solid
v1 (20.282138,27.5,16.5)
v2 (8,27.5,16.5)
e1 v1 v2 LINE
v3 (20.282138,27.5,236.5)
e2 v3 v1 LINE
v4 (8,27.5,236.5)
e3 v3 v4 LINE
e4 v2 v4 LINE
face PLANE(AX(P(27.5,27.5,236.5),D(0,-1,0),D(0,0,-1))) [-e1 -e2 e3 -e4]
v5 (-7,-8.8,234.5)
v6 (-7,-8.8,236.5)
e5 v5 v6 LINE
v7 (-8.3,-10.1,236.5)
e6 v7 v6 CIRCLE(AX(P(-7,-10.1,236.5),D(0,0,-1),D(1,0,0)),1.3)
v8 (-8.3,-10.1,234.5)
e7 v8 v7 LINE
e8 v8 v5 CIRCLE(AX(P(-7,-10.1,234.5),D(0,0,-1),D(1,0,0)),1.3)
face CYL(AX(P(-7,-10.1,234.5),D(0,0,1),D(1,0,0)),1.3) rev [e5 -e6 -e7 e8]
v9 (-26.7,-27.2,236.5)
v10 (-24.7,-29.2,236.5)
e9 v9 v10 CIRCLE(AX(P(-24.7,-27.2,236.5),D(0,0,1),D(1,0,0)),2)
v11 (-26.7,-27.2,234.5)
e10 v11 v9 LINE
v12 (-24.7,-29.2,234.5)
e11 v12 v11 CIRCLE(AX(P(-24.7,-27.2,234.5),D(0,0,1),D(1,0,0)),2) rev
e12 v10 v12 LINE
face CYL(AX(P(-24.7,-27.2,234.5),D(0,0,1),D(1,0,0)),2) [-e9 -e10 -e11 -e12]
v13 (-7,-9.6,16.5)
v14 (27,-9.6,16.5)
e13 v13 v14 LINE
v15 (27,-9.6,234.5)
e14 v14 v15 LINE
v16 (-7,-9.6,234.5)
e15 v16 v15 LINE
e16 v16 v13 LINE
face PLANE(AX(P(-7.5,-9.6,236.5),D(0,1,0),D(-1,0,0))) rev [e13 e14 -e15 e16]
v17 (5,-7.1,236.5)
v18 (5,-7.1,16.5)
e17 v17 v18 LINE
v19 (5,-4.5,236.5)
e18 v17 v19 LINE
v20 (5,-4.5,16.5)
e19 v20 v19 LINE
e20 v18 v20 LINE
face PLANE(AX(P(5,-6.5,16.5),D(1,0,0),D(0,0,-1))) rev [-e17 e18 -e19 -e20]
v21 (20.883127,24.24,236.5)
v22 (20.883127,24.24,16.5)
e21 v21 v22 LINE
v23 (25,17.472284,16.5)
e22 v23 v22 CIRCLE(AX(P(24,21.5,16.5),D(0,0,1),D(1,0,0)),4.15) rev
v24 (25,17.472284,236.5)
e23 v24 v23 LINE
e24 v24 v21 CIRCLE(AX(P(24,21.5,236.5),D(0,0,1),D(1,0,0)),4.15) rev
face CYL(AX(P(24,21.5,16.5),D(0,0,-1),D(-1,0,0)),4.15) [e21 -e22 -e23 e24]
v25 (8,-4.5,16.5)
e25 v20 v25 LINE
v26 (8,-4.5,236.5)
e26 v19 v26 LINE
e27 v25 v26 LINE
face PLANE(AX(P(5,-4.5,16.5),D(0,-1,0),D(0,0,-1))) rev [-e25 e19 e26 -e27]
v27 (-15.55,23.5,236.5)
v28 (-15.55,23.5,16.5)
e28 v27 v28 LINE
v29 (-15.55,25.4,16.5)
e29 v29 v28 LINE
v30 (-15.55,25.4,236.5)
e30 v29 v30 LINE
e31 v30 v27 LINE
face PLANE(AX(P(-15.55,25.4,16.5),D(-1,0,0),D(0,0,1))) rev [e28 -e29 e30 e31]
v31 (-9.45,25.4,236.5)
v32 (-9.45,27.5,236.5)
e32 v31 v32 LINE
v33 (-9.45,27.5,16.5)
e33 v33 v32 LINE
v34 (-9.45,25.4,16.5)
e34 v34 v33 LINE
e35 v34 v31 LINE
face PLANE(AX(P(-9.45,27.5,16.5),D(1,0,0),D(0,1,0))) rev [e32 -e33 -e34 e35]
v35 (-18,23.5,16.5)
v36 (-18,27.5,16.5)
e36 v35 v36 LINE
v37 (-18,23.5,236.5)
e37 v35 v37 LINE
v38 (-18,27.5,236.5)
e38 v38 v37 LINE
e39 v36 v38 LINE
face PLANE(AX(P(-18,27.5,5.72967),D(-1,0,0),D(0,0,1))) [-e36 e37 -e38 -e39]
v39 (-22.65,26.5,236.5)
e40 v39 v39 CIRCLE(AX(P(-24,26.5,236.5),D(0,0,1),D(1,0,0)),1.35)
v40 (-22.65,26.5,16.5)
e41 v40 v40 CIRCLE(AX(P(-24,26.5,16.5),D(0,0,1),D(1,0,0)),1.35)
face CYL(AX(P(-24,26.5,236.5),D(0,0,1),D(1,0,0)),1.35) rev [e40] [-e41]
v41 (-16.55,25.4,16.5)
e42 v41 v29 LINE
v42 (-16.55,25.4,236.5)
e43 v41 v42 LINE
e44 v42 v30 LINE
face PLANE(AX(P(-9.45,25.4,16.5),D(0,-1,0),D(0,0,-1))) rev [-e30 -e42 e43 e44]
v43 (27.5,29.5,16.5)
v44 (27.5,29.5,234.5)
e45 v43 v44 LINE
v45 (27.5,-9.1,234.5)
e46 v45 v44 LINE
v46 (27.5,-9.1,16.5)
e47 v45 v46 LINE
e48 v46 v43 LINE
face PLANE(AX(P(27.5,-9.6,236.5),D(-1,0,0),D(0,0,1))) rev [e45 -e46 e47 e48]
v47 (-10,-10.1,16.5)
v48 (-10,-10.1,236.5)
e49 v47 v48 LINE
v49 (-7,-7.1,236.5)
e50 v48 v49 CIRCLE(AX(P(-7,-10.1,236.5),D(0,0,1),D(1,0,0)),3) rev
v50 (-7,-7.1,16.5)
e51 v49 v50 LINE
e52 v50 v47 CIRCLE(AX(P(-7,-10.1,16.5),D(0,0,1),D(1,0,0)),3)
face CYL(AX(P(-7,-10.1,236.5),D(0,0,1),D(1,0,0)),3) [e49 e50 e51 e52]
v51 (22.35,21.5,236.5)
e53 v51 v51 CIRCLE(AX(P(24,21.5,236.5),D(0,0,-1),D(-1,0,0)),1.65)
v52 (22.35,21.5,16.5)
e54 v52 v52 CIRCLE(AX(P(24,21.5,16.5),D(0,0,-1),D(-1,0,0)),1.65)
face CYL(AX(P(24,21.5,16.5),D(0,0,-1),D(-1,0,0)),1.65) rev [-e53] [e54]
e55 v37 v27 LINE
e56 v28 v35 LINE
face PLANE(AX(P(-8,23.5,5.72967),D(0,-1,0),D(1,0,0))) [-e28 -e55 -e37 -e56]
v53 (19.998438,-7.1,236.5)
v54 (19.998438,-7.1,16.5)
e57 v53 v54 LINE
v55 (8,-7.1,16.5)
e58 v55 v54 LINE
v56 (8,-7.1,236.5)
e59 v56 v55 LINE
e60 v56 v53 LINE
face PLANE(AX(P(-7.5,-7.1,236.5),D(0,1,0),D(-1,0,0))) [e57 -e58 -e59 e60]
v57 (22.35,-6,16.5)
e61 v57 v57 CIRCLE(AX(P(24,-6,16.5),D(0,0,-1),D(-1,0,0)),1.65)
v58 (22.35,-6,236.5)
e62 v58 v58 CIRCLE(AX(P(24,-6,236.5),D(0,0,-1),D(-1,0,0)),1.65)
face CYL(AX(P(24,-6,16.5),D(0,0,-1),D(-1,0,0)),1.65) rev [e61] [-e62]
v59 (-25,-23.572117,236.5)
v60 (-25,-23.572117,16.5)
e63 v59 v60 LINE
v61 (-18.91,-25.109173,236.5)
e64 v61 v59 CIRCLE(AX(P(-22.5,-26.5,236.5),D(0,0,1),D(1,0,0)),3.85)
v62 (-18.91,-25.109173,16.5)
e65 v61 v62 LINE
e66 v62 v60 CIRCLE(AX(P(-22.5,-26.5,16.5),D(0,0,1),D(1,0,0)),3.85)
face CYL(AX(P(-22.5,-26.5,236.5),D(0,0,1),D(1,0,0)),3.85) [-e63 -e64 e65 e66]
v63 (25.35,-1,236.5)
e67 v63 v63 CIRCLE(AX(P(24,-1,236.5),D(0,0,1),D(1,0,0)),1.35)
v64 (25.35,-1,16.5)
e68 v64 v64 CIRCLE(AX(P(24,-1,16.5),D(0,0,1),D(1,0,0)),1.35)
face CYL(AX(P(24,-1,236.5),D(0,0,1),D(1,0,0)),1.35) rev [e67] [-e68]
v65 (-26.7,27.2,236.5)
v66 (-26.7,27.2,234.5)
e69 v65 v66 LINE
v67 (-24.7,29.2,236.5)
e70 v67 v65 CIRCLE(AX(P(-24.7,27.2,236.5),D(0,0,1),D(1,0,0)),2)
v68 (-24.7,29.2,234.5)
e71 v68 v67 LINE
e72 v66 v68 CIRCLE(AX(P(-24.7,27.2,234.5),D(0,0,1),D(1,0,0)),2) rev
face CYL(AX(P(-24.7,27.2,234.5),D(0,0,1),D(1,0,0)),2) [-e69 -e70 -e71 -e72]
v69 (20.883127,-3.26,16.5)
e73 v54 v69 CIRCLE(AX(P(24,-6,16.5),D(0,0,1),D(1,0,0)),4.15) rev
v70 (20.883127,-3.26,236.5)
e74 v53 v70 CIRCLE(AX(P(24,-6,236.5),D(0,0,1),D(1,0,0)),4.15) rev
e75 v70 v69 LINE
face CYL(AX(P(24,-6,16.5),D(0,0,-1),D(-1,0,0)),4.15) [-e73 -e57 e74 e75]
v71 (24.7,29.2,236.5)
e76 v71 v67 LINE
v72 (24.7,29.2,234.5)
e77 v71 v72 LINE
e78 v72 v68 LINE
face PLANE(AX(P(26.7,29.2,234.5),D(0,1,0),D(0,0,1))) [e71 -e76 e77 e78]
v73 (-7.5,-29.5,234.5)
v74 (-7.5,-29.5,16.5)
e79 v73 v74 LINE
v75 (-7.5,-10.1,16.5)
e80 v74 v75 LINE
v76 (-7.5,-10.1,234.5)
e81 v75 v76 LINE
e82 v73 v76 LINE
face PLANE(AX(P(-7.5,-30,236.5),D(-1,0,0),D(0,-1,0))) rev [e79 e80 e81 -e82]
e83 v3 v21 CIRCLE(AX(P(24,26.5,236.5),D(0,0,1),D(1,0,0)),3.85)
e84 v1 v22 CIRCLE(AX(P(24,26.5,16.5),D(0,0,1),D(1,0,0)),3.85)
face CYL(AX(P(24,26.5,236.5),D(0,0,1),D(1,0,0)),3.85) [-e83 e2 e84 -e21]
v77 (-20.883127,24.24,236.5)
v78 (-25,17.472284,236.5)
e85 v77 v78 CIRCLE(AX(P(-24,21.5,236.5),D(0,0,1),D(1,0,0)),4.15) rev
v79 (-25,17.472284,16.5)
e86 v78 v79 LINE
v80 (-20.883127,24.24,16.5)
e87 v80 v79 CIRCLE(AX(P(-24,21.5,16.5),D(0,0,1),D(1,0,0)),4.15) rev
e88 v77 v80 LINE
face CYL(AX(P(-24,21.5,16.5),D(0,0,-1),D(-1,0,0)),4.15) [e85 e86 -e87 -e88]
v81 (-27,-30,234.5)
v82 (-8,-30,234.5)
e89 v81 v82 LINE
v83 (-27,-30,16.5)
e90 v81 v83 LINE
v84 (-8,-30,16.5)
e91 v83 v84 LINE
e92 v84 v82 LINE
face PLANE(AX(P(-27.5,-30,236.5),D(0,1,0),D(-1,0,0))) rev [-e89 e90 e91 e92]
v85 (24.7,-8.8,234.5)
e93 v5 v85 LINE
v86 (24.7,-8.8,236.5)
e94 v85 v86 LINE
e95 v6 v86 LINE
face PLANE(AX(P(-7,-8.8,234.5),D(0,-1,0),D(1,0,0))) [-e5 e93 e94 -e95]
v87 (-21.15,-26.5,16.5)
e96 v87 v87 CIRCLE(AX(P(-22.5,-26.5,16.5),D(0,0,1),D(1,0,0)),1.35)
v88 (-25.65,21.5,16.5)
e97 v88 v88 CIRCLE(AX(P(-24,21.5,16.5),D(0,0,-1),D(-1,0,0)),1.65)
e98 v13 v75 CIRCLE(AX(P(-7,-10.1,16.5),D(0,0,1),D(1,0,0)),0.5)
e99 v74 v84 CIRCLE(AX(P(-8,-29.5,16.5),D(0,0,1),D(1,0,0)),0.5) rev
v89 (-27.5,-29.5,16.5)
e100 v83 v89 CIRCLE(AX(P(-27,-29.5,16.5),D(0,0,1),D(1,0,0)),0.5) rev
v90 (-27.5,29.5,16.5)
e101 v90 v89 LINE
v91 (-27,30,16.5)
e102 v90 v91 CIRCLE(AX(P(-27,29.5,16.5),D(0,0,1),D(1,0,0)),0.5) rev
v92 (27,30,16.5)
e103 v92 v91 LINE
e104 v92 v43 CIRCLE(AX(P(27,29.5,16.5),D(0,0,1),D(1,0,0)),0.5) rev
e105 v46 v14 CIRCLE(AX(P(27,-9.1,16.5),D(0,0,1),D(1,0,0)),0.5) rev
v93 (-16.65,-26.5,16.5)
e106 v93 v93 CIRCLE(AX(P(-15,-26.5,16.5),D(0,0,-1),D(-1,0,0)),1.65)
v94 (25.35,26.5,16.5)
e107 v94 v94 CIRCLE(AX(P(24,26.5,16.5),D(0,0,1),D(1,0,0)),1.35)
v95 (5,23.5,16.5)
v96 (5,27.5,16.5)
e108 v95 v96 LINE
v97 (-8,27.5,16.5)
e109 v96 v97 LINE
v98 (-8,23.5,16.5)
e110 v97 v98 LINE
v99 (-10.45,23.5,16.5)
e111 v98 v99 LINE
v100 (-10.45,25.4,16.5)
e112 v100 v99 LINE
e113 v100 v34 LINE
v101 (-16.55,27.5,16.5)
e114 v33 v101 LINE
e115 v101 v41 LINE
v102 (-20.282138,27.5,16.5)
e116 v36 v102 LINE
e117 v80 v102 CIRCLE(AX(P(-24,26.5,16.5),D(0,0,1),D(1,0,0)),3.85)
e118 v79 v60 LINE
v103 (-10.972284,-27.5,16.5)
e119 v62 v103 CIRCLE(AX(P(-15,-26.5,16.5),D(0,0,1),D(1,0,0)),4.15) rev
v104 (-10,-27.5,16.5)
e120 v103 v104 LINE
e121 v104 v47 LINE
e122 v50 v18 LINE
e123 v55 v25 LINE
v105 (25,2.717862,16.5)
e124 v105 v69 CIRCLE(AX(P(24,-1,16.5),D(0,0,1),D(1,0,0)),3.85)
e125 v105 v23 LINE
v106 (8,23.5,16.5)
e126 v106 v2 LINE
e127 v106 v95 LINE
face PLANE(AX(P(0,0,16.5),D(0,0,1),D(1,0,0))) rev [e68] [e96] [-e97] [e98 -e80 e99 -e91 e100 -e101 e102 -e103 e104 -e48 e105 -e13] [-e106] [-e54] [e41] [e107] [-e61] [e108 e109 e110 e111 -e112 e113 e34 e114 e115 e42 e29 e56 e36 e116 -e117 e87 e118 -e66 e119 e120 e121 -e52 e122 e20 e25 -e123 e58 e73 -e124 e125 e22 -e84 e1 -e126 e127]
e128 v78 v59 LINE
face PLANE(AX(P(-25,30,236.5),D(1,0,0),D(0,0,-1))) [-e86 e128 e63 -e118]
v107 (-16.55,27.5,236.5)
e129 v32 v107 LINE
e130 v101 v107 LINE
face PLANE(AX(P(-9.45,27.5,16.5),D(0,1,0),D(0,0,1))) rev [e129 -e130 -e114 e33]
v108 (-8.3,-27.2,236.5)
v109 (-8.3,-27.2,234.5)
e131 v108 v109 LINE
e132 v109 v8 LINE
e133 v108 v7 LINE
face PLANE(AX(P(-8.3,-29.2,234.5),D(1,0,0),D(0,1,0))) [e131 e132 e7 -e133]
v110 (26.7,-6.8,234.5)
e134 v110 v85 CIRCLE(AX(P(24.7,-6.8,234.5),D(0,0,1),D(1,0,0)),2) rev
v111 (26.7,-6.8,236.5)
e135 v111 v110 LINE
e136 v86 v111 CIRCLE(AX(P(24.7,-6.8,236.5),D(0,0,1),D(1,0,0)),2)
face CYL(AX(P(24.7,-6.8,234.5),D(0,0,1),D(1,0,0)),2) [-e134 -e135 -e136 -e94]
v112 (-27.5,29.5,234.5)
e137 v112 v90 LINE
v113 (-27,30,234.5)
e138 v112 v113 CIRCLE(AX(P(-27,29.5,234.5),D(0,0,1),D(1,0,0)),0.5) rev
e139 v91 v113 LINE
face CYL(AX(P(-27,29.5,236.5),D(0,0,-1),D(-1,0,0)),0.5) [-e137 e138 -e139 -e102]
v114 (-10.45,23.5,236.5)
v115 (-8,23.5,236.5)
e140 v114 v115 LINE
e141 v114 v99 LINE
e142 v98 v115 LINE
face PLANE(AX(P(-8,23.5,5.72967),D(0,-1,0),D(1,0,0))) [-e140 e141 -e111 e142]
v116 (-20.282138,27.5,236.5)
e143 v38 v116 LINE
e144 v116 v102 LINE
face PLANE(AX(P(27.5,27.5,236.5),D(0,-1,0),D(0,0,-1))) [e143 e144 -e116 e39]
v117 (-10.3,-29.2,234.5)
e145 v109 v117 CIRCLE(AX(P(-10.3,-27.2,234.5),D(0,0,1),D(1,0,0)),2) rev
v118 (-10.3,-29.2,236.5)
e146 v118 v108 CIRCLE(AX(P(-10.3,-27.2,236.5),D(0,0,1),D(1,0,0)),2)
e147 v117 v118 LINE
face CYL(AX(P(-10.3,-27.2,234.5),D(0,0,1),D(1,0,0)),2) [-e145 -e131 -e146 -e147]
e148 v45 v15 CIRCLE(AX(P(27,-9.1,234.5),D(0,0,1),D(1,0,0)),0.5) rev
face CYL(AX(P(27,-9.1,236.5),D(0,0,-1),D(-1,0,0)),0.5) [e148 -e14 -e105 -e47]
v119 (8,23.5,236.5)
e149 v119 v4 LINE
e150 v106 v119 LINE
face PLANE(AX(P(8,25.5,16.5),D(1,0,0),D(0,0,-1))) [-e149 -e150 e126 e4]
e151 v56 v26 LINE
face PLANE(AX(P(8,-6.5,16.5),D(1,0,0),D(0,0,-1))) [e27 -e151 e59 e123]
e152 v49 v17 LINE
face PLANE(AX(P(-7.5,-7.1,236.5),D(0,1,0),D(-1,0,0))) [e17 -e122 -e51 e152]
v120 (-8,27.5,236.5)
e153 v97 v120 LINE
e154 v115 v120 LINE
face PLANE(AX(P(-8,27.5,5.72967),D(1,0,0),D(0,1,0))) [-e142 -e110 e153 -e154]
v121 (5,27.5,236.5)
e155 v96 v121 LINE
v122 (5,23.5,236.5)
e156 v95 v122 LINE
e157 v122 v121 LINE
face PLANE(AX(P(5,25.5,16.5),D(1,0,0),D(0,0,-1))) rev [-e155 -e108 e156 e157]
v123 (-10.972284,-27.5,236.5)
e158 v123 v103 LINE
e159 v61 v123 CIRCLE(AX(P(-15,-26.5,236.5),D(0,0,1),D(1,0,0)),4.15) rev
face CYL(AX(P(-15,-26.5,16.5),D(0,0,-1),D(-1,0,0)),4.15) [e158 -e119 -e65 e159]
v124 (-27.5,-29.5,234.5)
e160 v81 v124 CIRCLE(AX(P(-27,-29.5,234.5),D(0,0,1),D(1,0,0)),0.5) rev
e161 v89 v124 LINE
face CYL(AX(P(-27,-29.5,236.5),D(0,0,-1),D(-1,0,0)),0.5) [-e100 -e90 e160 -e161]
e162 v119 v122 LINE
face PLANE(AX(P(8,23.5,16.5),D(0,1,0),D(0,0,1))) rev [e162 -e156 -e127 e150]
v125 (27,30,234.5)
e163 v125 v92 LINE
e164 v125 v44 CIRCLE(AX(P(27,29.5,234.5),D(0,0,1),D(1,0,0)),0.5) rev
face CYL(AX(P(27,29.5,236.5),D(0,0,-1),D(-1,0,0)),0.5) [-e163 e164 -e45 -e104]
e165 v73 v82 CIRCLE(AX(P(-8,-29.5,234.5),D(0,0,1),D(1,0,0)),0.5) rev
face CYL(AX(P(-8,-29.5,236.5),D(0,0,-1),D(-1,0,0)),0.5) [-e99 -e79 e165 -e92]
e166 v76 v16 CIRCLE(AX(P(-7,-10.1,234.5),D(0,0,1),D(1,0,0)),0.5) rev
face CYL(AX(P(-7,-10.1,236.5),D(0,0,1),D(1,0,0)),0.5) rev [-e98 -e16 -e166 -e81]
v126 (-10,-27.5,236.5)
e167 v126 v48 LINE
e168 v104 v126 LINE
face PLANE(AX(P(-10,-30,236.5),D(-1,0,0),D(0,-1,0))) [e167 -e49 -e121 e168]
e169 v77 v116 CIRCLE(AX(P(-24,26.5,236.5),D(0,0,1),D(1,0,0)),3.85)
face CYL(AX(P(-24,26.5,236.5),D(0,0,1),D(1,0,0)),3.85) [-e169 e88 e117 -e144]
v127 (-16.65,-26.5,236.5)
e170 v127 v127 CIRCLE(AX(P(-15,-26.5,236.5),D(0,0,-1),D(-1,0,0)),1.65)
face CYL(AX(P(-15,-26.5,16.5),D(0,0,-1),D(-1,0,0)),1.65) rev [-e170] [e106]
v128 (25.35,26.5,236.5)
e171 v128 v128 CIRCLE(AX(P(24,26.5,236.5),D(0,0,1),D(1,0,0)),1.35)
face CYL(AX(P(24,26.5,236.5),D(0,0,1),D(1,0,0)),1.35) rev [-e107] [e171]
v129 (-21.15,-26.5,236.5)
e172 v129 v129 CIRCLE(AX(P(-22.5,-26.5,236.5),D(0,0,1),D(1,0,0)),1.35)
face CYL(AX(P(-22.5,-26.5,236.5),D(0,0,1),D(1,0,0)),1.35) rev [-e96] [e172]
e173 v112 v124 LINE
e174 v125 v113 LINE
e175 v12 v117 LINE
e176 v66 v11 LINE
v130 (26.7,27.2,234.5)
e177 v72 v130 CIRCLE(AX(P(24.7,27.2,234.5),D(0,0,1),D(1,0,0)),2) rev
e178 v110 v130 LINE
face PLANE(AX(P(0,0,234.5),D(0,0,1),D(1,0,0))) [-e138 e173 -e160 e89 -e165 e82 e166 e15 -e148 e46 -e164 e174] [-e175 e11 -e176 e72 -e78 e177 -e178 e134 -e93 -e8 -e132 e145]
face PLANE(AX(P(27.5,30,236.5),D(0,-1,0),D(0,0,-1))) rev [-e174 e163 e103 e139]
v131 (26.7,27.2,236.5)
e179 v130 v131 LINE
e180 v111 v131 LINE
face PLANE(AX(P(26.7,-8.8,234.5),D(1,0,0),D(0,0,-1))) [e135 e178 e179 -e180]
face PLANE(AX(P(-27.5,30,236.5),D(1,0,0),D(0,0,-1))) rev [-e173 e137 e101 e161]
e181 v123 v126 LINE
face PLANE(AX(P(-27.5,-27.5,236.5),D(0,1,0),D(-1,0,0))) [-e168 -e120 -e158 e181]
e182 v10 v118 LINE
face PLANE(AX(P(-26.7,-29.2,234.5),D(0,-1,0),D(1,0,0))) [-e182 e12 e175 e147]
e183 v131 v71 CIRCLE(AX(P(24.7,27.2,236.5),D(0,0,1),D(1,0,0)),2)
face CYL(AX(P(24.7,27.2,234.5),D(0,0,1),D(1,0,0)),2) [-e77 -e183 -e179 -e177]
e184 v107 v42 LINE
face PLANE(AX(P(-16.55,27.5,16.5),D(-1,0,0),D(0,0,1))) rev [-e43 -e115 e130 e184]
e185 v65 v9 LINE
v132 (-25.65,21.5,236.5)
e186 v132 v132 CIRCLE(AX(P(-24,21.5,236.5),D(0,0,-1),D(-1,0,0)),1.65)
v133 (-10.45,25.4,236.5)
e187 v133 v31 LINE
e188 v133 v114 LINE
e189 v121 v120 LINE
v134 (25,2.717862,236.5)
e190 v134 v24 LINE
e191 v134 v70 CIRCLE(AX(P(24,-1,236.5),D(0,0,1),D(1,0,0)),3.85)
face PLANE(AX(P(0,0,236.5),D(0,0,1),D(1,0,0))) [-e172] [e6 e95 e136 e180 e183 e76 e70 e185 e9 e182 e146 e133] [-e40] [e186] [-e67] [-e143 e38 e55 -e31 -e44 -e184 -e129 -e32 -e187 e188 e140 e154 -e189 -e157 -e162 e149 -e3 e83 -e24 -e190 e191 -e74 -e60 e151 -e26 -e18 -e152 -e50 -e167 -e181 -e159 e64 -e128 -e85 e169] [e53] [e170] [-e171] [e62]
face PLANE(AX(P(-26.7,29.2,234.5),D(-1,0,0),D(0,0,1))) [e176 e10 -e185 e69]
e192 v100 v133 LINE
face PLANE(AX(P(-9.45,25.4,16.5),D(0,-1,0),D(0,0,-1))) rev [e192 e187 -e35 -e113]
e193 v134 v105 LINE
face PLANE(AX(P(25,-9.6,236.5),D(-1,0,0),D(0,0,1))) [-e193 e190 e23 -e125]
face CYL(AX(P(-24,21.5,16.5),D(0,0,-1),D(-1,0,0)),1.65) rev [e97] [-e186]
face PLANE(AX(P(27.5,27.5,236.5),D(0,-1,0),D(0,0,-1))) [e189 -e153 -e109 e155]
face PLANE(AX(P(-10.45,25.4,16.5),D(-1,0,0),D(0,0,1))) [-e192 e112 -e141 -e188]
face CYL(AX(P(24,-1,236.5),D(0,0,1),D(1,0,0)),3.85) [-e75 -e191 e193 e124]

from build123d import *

# Parameters (mm, degrees)
SKETCH_1_W                       = 55
SKETCH_1_H                       = 60
EXTRUDE_1_DEPTH                  = 16.5
HOLE_WIZARD_3_6_3_6_1_D          = 3.6
HOLE_WIZARD_3_6_3_6_1_DEPTH      = 25
HOLE_WIZARD_3_6_3_6_1_TIP        = 1.081549114
HOLE_WIZARD_M2_5_1_D             = 2.05
HOLE_WIZARD_M2_5_1_DEPTH         = 14
HOLE_WIZARD_M2_5_1_TIP           = 0.615882135
SKETCH_8_W                       = 35
SKETCH_8_H                       = 20.4
CUT_EXTRUDE_1_DEPTH              = 44.914690025
CUT_EXTRUDE_START                = 2.5
SKETCH_9_W                       = 20
SKETCH_9_H                       = 6
CUT_EXTRUDE_2_DEPTH              = 42.414690025
SHELL_START                      = 1.8
SHELL_1_DEPTH                    = 14.7
EXTRUDE_2_DEPTH                  = 220
HOLE_WIZARD_1_AT_2_COUNT         = 2
HOLE_WIZARD_1_AT_2_PITCH         = 48
HOLE_WIZARD_1_AT_3_COUNT         = 2
HOLE_WIZARD_1_AT_3_PITCH         = 27.5
HOLE_WIZARD_1_AT_4_COUNT         = 2
HOLE_WIZARD_1_AT_4_PITCH         = 70.507091842
SKETCH_16_R                      = 3
CUT_EXTRUDE_4_DEPTH              = 12
FILLET_1_R                       = 0.5
FILLET_2_R                       = 0.5
SKETCH_20_W                      = 1.65
SKETCH_20_H                      = 220
HOLE_WIZARD_M4_1_AT_2_COUNT      = 2
HOLE_WIZARD_M4_1_AT_2_PITCH      = 27.5
HOLE_WIZARD_M4_1_AT_3_COUNT      = 2
HOLE_WIZARD_M4_1_AT_3_PITCH      = 61.846584384
HOLE_WIZARD_M4_1_AT_4_COUNT      = 2
HOLE_WIZARD_M4_1_AT_4_PITCH      = 48
SKETCH_22_W                      = 1.35
SKETCH_22_H                      = 236.5
HOLE_WIZARD_2_7_2_7_1_AT_2_COUNT = 2
HOLE_WIZARD_2_7_2_7_1_AT_2_PITCH = 27.5
HOLE_WIZARD_2_7_2_7_1_AT_3_COUNT = 2
HOLE_WIZARD_2_7_2_7_1_AT_3_PITCH = 48
HOLE_WIZARD_2_7_2_7_1_AT_4_COUNT = 2
HOLE_WIZARD_2_7_2_7_1_AT_4_PITCH = 70.507091842
SHELL_START_2                    = 16.5
SHELL_2_DEPTH                    = 220
EXTRUDE_1_2_DEPTH                = 220
SKETCH_25_W                      = 10
SKETCH_25_H                      = 4
EXTRUDE_3_DEPTH                  = 220
SKETCH_26_W                      = 7.1
SKETCH_26_H                      = 2.1
CUT_EXTRUDE_5_DEPTH              = 224.732541218
CUT_EXTRUDE_1_2_DEPTH            = 224.732541218
CUT_EXTRUDE_1_2_DEPTH_BACK       = 224.732541218
SKETCH_27_W                      = 5.1
SKETCH_27_H                      = 2.702569417
SKETCH_28_R                      = 75.950047439
CUT_EXTRUDE_6_DEPTH              = 2
FILLET_3_R                       = 2


# Read off the part's stored shape, not the designer's step: 抽壳1, 抽壳2
with BuildPart() as part:
    # 草图1 → Extrude 1 (new body)
    with BuildSketch(Plane.XY):
        Rectangle(SKETCH_1_W, SKETCH_1_H)
    extrude(amount=EXTRUDE_1_DEPTH)

    # Ø3.6 (3.6) 直径孔1
    with Locations(Plane.XY.offset(16.5)):
        with Locations((-24, 21.5), (24, 21.5), (24, -6), (-15, -26.5)):
            Hole(HOLE_WIZARD_3_6_3_6_1_D / 2, depth=HOLE_WIZARD_3_6_3_6_1_DEPTH)
            with Locations((0, 0, -(HOLE_WIZARD_3_6_3_6_1_DEPTH + HOLE_WIZARD_3_6_3_6_1_TIP / 2))):  # 118° drill point
                Cone(0, HOLE_WIZARD_3_6_3_6_1_D / 2, HOLE_WIZARD_3_6_3_6_1_TIP, mode=Mode.SUBTRACT)

    # M2.5 螺纹孔1
    with Locations(Plane.XY.offset(16.5)):
        with Locations((-24, 26.5), (24, 26.5), (24, -1), (-22.5, -26.5)):
            Hole(HOLE_WIZARD_M2_5_1_D / 2, depth=HOLE_WIZARD_M2_5_1_DEPTH)
            with Locations((0, 0, -(HOLE_WIZARD_M2_5_1_DEPTH + HOLE_WIZARD_M2_5_1_TIP / 2))):  # 118° drill point
                Cone(0, HOLE_WIZARD_M2_5_1_D / 2, HOLE_WIZARD_M2_5_1_TIP, mode=Mode.SUBTRACT)

    # 草图8 → Cut-Extrude 1 (cut, through all)
    with BuildSketch(Plane.XY.offset(16.5)):
        with Locations((10, -19.8)):
            Rectangle(SKETCH_8_W, SKETCH_8_H)
    extrude(amount=-CUT_EXTRUDE_1_DEPTH, mode=Mode.SUBTRACT)

    # 草图9 → 切除-拉伸2 (cut, through all)
    with BuildSketch(Plane(origin=(0, 0, 16.5), x_dir=(-1, 0, 0), z_dir=(0, 0, -1)).offset(CUT_EXTRUDE_START)):
        with Locations((17.5, -27)):
            Rectangle(SKETCH_9_W, SKETCH_9_H)
    extrude(amount=CUT_EXTRUDE_2_DEPTH, mode=Mode.SUBTRACT)

    # 抽壳1 outline → 抽壳1 (cut)
    with BuildSketch(Plane.XY.offset(SHELL_START)):
        with BuildLine():
            ThreePointArc((-21.743758657, 28.2), (-21.182110509, 26.299690696), (-22.006919283, 24.4979375))
            ThreePointArc((-22.006919283, 24.4979375), (-20.910890356, 19.651378458), (-25.7, 18.326673669))
            Line((-25.7, 18.326673669), (-25.7, -22.2))
            Line((-25.7, -22.2), (-9.3, -22.2))
            Line((-9.3, -22.2), (-9.3, -7.8))
            Line((-9.3, -7.8), (20.882308546, -7.8))
            ThreePointArc((20.882308546, -7.8), (20.494996561, -5.178446051), (22.006919283, -3.0020625))
            ThreePointArc((22.006919283, -3.0020625), (21.865811165, 0.8509087), (25.7, 1.256241343))
            Line((25.7, 1.256241343), (25.7, 18.326673669))
            ThreePointArc((25.7, 18.326673669), (20.910890356, 19.651378458), (22.006919283, 24.4979375))
            ThreePointArc((22.006919283, 24.4979375), (21.182110509, 26.299690696), (21.743758657, 28.2))
            Line((21.743758657, 28.2), (-21.743758657, 28.2))
        make_face()
    extrude(amount=SHELL_1_DEPTH, mode=Mode.SUBTRACT)


with BuildPart() as body_2:
    # 草图10 → 凸台-拉伸2 (new body)
    with BuildSketch(Plane.XY.offset(16.5)):
        Polygon((-27.5, -30), (-7.5, -30), (-7.5, -9.6), (27.5, -9.6), (27.5, 30), (-27.5, 30), align=None)
    extrude(amount=EXTRUDE_2_DEPTH)


with BuildPart() as hole_wizard_1_tool:
    # 草图13 → 打孔尺寸(%根据)内六角圆柱头螺钉的类型1 (revolve)
    with BuildSketch(Plane(origin=(24, 26.5, 236.5), x_dir=(0, -1, 0), z_dir=(1, 0, 0))):
        Polygon((0, 0), (0, 236.5), (1, 236.5), (1, 1.5), (1.05, 1.5), (1.05, 0), align=None)
    hole_wizard_1 = revolve(axis=Axis((24, 26.5, 242.85), (0, 0, -1)))


with BuildPart() as part_1:
    add(part.part)

    # 打孔尺寸(%根据)内六角圆柱头螺钉的类型1: cut by hole_wizard_1_tool
    add(hole_wizard_1_tool.part, mode=Mode.SUBTRACT)


with BuildPart() as body_2_1:
    add(body_2.part)

    # 打孔尺寸(%根据)内六角圆柱头螺钉的类型1: cut by hole_wizard_1_tool
    add(hole_wizard_1_tool.part, mode=Mode.SUBTRACT)


with BuildPart() as hole_wizard_1_at_2_tool:
    # 打孔尺寸(%根据)内六角圆柱头螺钉的类型1 at 2: 打孔尺寸(%根据)内六角圆柱头螺钉的类型1 ×2
    with Locations(*[(-i * HOLE_WIZARD_1_AT_2_PITCH, 0, 0) for i in range(1, HOLE_WIZARD_1_AT_2_COUNT)]):
        add(hole_wizard_1)


with BuildPart() as part_2:
    add(part_1.part)

    # 打孔尺寸(%根据)内六角圆柱头螺钉的类型1 at 2: cut by hole_wizard_1_at_2_tool
    add(hole_wizard_1_at_2_tool.part, mode=Mode.SUBTRACT)


with BuildPart() as body_2_2:
    add(body_2_1.part)

    # 打孔尺寸(%根据)内六角圆柱头螺钉的类型1 at 2: cut by hole_wizard_1_at_2_tool
    add(hole_wizard_1_at_2_tool.part, mode=Mode.SUBTRACT)


with BuildPart() as hole_wizard_1_at_3_tool:
    # 打孔尺寸(%根据)内六角圆柱头螺钉的类型1 at 3: 打孔尺寸(%根据)内六角圆柱头螺钉的类型1 ×2
    with Locations(*[(0, -i * HOLE_WIZARD_1_AT_3_PITCH, 0) for i in range(1, HOLE_WIZARD_1_AT_3_COUNT)]):
        add(hole_wizard_1)


with BuildPart() as part_3:
    add(part_2.part)

    # 打孔尺寸(%根据)内六角圆柱头螺钉的类型1 at 3: cut by hole_wizard_1_at_3_tool
    add(hole_wizard_1_at_3_tool.part, mode=Mode.SUBTRACT)

    # 草图16 → 切除-拉伸4 (cut)
    with BuildSketch(Plane(origin=(-7.5, 0, 0), x_dir=(0, 0, -1), z_dir=(1, 0, 0))):
        with Locations(Location((-8, -18, 0), (0, 0, 90))):
            Circle(SKETCH_16_R)
    extrude(amount=-CUT_EXTRUDE_4_DEPTH, mode=Mode.SUBTRACT)

    # 圆角1
    fillet_1_edges = [part_3.edges().sort_by_distance(p)[0] for p in [
        (-27.5, 3, 0),
        (0, 30, 0),
        (27.5, 10.2, 0),
        (27.5, -9.6, 8.25),
        (-7.5, -16.8, 0),
        (10, -9.6, 0),
        (-7.5, -9.6, 8.25),
        (-7.5, -30, 15.25),
        (-27.5, -30, 15.25),
        (-27.5, 30, 8.25),
        (27.5, 30, 8.25),
        (-17.5, -24, 0),
        (-7.5, -24, 7),
        (-27.5, -24, 7),
    ]]
    fillet(fillet_1_edges, radius=FILLET_1_R)


with BuildPart() as body_2_3:
    add(body_2_2.part)

    # 打孔尺寸(%根据)内六角圆柱头螺钉的类型1 at 3: cut by hole_wizard_1_at_3_tool
    add(hole_wizard_1_at_3_tool.part, mode=Mode.SUBTRACT)

    # 打孔尺寸(%根据)内六角圆柱头螺钉的类型1 at 4: 打孔尺寸(%根据)内六角圆柱头螺钉的类型1 ×2
    with Locations(*[Vector(-0.6595081258531857, -0.7516974337681476, 0) * (i * HOLE_WIZARD_1_AT_4_PITCH) for i in range(1, HOLE_WIZARD_1_AT_4_COUNT)]):
        add(hole_wizard_1, mode=Mode.SUBTRACT)

    # 圆角2
    fillet_2_edges = [body_2_3.edges().sort_by_distance(p)[0] for p in [
        (-27.5, 30, 126.5),
        (27.5, 30, 126.5),
        (27.5, -9.6, 126.5),
        (-7.5, -9.6, 126.5),
        (-7.5, -30, 126.5),
        (-27.5, -30, 126.5),
    ]]
    fillet(fillet_2_edges, radius=FILLET_2_R)

    # 草图20 → M4 螺纹孔1 (revolve, cut)
    with BuildSketch(Plane(origin=(24, 21.5, 16.5), x_dir=(0, 1, 0), z_dir=(1, 0, 0))):
        with Locations((0.825, 110)):
            Rectangle(SKETCH_20_W, SKETCH_20_H)
    hole_wizard_m4_1 = revolve(axis=Axis((24, 21.5, 10.15), (0, 0, 1)), mode=Mode.SUBTRACT)

    # M4 螺纹孔1 at 2: M4 螺纹孔1 ×2
    with Locations(*[(0, -i * HOLE_WIZARD_M4_1_AT_2_PITCH, 0) for i in range(1, HOLE_WIZARD_M4_1_AT_2_COUNT)]):
        add(hole_wizard_m4_1, mode=Mode.SUBTRACT)

    # M4 螺纹孔1 at 3: M4 螺纹孔1 ×2
    with Locations(*[Vector(-0.6305926250944656, -0.7761140001162656, 0) * (i * HOLE_WIZARD_M4_1_AT_3_PITCH) for i in range(1, HOLE_WIZARD_M4_1_AT_3_COUNT)]):
        add(hole_wizard_m4_1, mode=Mode.SUBTRACT)

    # M4 螺纹孔1 at 4: M4 螺纹孔1 ×2
    with Locations(*[(-i * HOLE_WIZARD_M4_1_AT_4_PITCH, 0, 0) for i in range(1, HOLE_WIZARD_M4_1_AT_4_COUNT)]):
        add(hole_wizard_m4_1, mode=Mode.SUBTRACT)


with BuildPart() as hole_wizard_2_7_2_7_1_tool:
    # 草图22 → Ø2.7 (2.7) 直径孔1 (revolve)
    with BuildSketch(Plane(origin=(24, 26.5, 236.5), x_dir=(0, -1, 0), z_dir=(1, 0, 0))):
        with Locations((0.675, 118.25)):
            Rectangle(SKETCH_22_W, SKETCH_22_H)
    hole_wizard_2_7_2_7_1 = revolve(axis=Axis((24, 26.5, 242.85), (0, 0, -1)))


with BuildPart() as part_4:
    add(part_3.part)

    # Ø2.7 (2.7) 直径孔1: cut by hole_wizard_2_7_2_7_1_tool
    add(hole_wizard_2_7_2_7_1_tool.part, mode=Mode.SUBTRACT)


with BuildPart() as body_2_4:
    add(body_2_3.part)

    # Ø2.7 (2.7) 直径孔1: cut by hole_wizard_2_7_2_7_1_tool
    add(hole_wizard_2_7_2_7_1_tool.part, mode=Mode.SUBTRACT)


with BuildPart() as hole_wizard_2_7_2_7_1_at_2_tool:
    # Ø2.7 (2.7) 直径孔1 at 2: Ø2.7 (2.7) 直径孔1 ×2
    with Locations(*[(0, -i * HOLE_WIZARD_2_7_2_7_1_AT_2_PITCH, 0) for i in range(1, HOLE_WIZARD_2_7_2_7_1_AT_2_COUNT)]):
        add(hole_wizard_2_7_2_7_1)


with BuildPart() as part_5:
    add(part_4.part)

    # Ø2.7 (2.7) 直径孔1 at 2: cut by hole_wizard_2_7_2_7_1_at_2_tool
    add(hole_wizard_2_7_2_7_1_at_2_tool.part, mode=Mode.SUBTRACT)


with BuildPart() as body_2_5:
    add(body_2_4.part)

    # Ø2.7 (2.7) 直径孔1 at 2: cut by hole_wizard_2_7_2_7_1_at_2_tool
    add(hole_wizard_2_7_2_7_1_at_2_tool.part, mode=Mode.SUBTRACT)


with BuildPart() as hole_wizard_2_7_2_7_1_at_3_tool:
    # Ø2.7 (2.7) 直径孔1 at 3: Ø2.7 (2.7) 直径孔1 ×2
    with Locations(*[(-i * HOLE_WIZARD_2_7_2_7_1_AT_3_PITCH, 0, 0) for i in range(1, HOLE_WIZARD_2_7_2_7_1_AT_3_COUNT)]):
        add(hole_wizard_2_7_2_7_1)


with BuildPart() as part_6:
    add(part_5.part)

    # Ø2.7 (2.7) 直径孔1 at 3: cut by hole_wizard_2_7_2_7_1_at_3_tool
    add(hole_wizard_2_7_2_7_1_at_3_tool.part, mode=Mode.SUBTRACT)


with BuildPart() as body_2_6:
    add(body_2_5.part)

    # Ø2.7 (2.7) 直径孔1 at 3: cut by hole_wizard_2_7_2_7_1_at_3_tool
    add(hole_wizard_2_7_2_7_1_at_3_tool.part, mode=Mode.SUBTRACT)


with BuildPart() as hole_wizard_2_7_2_7_1_at_4_tool:
    # Ø2.7 (2.7) 直径孔1 at 4: Ø2.7 (2.7) 直径孔1 ×2
    with Locations(*[Vector(-0.6595081258531857, -0.7516974337681476, 0) * (i * HOLE_WIZARD_2_7_2_7_1_AT_4_PITCH) for i in range(1, HOLE_WIZARD_2_7_2_7_1_AT_4_COUNT)]):
        add(hole_wizard_2_7_2_7_1)


with BuildPart() as part_7:
    add(part_6.part)

    # Ø2.7 (2.7) 直径孔1 at 4: cut by hole_wizard_2_7_2_7_1_at_4_tool
    add(hole_wizard_2_7_2_7_1_at_4_tool.part, mode=Mode.SUBTRACT)


with BuildPart() as body_2_7:
    add(body_2_6.part)

    # Ø2.7 (2.7) 直径孔1 at 4: cut by hole_wizard_2_7_2_7_1_at_4_tool
    add(hole_wizard_2_7_2_7_1_at_4_tool.part, mode=Mode.SUBTRACT)

    # 抽壳2 outline → 抽壳2 (cut)
    with BuildSketch(Plane.XY.offset(SHELL_START_2)):
        with BuildLine():
            ThreePointArc((20.883126567, 24.24), (20.213800969, 25.802005085), (20.282137711, 27.5))
            Line((20.282137711, 27.5), (-20.282137711, 27.5))
            ThreePointArc((-20.282137711, 27.5), (-20.213800969, 25.802005085), (-20.883126567, 24.24))
            ThreePointArc((-20.883126567, 24.24), (-20.454469736, 19.343216481), (-25, 17.472283525))
            Line((-25, 17.472283525), (-25, -23.572116806))
            ThreePointArc((-25, -23.572116806), (-21.557842707, -22.767060189), (-18.91, -25.109172908))
            ThreePointArc((-18.91, -25.109172908), (-13.803138338, -22.526333914), (-10.972283525, -27.5))
            Line((-10.972283525, -27.5), (-10, -27.5))
            Line((-10, -27.5), (-10, -10.1))
            ThreePointArc((-10, -10.1), (-9.121320344, -7.978679656), (-7, -7.1))
            Line((-7, -7.1), (19.998437805, -7.1))
            ThreePointArc((19.998437805, -7.1), (19.955938743, -5.068298035), (20.883126567, -3.26))
            ThreePointArc((20.883126567, -3.26), (20.829196053, 1.183690072), (25, 2.717862289))
            Line((25, 2.717862289), (25, 17.472283525))
            ThreePointArc((25, 17.472283525), (20.454469736, 19.343216481), (20.883126567, 24.24))
        make_face()
    extrude(amount=SHELL_2_DEPTH, mode=Mode.SUBTRACT)

    # 草图24 → Extrude 1 2 (add)
    with BuildSketch(Plane.XY.offset(236.5)):
        Polygon((8, 23.5), (8, 25.5), (8, 27.5), (5, 27.5), (5, 25.5), (5, 23.5), align=None)
        Polygon((5, -4.5), (5, -6.5), (5, -7.658100232), (8, -7.658100232), (8, -6.5), (8, -4.5), align=None)
    extrude(amount=-EXTRUDE_1_2_DEPTH)

    # 草图25 → 凸台-拉伸3 (add)
    with BuildSketch(Plane.XY.offset(236.5)):
        with Locations((-13, 25.5)):
            Rectangle(SKETCH_25_W, SKETCH_25_H)
    extrude(amount=-EXTRUDE_3_DEPTH)

    # 草图26 → 切除-拉伸5 (cut, through all)
    with BuildSketch(Plane.XY.offset(236.5)):
        with Locations((-13, 26.45)):
            Rectangle(SKETCH_26_W, SKETCH_26_H)
    extrude(amount=-CUT_EXTRUDE_5_DEPTH, mode=Mode.SUBTRACT)

    # 草图27 → Cut-Extrude 1 2 (cut, two sides: drawn at the far end of the back side and taken through both)
    with BuildSketch(Plane.XY.offset(236.5).offset(-CUT_EXTRUDE_1_2_DEPTH_BACK)):
        with Locations((-13, 24.048715292)):
            Rectangle(SKETCH_27_W, SKETCH_27_H)
    extrude(amount=CUT_EXTRUDE_1_2_DEPTH + CUT_EXTRUDE_1_2_DEPTH_BACK, mode=Mode.SUBTRACT)

    # 草图28 → 切除-拉伸6 (cut)
    with BuildSketch(Plane.XY.offset(236.5)):
        Circle(SKETCH_28_R)
        with BuildLine():
            Line((-26.7, -29.2), (-8.3, -29.2))
            Line((-8.3, -29.2), (-8.3, -10.1))
            ThreePointArc((-8.3, -10.1), (-7.919238816, -9.180761184), (-7, -8.8))
            Line((-7, -8.8), (26.7, -8.8))
            Line((26.7, -8.8), (26.7, 29.2))
            Line((26.7, 29.2), (-26.7, 29.2))
            Line((-26.7, 29.2), (-26.7, -29.2))
        make_face(mode=Mode.SUBTRACT)
    extrude(amount=-CUT_EXTRUDE_6_DEPTH, mode=Mode.SUBTRACT)

    # 圆角3
    fillet_3_edges = [body_2_7.edges().sort_by_distance(p)[0] for p in [
        (-26.7, 29.2, 235.5),
        (26.7, 29.2, 235.5),
        (26.7, -8.8, 235.5),
        (-8.3, -29.2, 235.5),
        (-26.7, -29.2, 235.5),
    ]]
    fillet(fillet_3_edges, radius=FILLET_3_R)


solid = body_2_7.part
